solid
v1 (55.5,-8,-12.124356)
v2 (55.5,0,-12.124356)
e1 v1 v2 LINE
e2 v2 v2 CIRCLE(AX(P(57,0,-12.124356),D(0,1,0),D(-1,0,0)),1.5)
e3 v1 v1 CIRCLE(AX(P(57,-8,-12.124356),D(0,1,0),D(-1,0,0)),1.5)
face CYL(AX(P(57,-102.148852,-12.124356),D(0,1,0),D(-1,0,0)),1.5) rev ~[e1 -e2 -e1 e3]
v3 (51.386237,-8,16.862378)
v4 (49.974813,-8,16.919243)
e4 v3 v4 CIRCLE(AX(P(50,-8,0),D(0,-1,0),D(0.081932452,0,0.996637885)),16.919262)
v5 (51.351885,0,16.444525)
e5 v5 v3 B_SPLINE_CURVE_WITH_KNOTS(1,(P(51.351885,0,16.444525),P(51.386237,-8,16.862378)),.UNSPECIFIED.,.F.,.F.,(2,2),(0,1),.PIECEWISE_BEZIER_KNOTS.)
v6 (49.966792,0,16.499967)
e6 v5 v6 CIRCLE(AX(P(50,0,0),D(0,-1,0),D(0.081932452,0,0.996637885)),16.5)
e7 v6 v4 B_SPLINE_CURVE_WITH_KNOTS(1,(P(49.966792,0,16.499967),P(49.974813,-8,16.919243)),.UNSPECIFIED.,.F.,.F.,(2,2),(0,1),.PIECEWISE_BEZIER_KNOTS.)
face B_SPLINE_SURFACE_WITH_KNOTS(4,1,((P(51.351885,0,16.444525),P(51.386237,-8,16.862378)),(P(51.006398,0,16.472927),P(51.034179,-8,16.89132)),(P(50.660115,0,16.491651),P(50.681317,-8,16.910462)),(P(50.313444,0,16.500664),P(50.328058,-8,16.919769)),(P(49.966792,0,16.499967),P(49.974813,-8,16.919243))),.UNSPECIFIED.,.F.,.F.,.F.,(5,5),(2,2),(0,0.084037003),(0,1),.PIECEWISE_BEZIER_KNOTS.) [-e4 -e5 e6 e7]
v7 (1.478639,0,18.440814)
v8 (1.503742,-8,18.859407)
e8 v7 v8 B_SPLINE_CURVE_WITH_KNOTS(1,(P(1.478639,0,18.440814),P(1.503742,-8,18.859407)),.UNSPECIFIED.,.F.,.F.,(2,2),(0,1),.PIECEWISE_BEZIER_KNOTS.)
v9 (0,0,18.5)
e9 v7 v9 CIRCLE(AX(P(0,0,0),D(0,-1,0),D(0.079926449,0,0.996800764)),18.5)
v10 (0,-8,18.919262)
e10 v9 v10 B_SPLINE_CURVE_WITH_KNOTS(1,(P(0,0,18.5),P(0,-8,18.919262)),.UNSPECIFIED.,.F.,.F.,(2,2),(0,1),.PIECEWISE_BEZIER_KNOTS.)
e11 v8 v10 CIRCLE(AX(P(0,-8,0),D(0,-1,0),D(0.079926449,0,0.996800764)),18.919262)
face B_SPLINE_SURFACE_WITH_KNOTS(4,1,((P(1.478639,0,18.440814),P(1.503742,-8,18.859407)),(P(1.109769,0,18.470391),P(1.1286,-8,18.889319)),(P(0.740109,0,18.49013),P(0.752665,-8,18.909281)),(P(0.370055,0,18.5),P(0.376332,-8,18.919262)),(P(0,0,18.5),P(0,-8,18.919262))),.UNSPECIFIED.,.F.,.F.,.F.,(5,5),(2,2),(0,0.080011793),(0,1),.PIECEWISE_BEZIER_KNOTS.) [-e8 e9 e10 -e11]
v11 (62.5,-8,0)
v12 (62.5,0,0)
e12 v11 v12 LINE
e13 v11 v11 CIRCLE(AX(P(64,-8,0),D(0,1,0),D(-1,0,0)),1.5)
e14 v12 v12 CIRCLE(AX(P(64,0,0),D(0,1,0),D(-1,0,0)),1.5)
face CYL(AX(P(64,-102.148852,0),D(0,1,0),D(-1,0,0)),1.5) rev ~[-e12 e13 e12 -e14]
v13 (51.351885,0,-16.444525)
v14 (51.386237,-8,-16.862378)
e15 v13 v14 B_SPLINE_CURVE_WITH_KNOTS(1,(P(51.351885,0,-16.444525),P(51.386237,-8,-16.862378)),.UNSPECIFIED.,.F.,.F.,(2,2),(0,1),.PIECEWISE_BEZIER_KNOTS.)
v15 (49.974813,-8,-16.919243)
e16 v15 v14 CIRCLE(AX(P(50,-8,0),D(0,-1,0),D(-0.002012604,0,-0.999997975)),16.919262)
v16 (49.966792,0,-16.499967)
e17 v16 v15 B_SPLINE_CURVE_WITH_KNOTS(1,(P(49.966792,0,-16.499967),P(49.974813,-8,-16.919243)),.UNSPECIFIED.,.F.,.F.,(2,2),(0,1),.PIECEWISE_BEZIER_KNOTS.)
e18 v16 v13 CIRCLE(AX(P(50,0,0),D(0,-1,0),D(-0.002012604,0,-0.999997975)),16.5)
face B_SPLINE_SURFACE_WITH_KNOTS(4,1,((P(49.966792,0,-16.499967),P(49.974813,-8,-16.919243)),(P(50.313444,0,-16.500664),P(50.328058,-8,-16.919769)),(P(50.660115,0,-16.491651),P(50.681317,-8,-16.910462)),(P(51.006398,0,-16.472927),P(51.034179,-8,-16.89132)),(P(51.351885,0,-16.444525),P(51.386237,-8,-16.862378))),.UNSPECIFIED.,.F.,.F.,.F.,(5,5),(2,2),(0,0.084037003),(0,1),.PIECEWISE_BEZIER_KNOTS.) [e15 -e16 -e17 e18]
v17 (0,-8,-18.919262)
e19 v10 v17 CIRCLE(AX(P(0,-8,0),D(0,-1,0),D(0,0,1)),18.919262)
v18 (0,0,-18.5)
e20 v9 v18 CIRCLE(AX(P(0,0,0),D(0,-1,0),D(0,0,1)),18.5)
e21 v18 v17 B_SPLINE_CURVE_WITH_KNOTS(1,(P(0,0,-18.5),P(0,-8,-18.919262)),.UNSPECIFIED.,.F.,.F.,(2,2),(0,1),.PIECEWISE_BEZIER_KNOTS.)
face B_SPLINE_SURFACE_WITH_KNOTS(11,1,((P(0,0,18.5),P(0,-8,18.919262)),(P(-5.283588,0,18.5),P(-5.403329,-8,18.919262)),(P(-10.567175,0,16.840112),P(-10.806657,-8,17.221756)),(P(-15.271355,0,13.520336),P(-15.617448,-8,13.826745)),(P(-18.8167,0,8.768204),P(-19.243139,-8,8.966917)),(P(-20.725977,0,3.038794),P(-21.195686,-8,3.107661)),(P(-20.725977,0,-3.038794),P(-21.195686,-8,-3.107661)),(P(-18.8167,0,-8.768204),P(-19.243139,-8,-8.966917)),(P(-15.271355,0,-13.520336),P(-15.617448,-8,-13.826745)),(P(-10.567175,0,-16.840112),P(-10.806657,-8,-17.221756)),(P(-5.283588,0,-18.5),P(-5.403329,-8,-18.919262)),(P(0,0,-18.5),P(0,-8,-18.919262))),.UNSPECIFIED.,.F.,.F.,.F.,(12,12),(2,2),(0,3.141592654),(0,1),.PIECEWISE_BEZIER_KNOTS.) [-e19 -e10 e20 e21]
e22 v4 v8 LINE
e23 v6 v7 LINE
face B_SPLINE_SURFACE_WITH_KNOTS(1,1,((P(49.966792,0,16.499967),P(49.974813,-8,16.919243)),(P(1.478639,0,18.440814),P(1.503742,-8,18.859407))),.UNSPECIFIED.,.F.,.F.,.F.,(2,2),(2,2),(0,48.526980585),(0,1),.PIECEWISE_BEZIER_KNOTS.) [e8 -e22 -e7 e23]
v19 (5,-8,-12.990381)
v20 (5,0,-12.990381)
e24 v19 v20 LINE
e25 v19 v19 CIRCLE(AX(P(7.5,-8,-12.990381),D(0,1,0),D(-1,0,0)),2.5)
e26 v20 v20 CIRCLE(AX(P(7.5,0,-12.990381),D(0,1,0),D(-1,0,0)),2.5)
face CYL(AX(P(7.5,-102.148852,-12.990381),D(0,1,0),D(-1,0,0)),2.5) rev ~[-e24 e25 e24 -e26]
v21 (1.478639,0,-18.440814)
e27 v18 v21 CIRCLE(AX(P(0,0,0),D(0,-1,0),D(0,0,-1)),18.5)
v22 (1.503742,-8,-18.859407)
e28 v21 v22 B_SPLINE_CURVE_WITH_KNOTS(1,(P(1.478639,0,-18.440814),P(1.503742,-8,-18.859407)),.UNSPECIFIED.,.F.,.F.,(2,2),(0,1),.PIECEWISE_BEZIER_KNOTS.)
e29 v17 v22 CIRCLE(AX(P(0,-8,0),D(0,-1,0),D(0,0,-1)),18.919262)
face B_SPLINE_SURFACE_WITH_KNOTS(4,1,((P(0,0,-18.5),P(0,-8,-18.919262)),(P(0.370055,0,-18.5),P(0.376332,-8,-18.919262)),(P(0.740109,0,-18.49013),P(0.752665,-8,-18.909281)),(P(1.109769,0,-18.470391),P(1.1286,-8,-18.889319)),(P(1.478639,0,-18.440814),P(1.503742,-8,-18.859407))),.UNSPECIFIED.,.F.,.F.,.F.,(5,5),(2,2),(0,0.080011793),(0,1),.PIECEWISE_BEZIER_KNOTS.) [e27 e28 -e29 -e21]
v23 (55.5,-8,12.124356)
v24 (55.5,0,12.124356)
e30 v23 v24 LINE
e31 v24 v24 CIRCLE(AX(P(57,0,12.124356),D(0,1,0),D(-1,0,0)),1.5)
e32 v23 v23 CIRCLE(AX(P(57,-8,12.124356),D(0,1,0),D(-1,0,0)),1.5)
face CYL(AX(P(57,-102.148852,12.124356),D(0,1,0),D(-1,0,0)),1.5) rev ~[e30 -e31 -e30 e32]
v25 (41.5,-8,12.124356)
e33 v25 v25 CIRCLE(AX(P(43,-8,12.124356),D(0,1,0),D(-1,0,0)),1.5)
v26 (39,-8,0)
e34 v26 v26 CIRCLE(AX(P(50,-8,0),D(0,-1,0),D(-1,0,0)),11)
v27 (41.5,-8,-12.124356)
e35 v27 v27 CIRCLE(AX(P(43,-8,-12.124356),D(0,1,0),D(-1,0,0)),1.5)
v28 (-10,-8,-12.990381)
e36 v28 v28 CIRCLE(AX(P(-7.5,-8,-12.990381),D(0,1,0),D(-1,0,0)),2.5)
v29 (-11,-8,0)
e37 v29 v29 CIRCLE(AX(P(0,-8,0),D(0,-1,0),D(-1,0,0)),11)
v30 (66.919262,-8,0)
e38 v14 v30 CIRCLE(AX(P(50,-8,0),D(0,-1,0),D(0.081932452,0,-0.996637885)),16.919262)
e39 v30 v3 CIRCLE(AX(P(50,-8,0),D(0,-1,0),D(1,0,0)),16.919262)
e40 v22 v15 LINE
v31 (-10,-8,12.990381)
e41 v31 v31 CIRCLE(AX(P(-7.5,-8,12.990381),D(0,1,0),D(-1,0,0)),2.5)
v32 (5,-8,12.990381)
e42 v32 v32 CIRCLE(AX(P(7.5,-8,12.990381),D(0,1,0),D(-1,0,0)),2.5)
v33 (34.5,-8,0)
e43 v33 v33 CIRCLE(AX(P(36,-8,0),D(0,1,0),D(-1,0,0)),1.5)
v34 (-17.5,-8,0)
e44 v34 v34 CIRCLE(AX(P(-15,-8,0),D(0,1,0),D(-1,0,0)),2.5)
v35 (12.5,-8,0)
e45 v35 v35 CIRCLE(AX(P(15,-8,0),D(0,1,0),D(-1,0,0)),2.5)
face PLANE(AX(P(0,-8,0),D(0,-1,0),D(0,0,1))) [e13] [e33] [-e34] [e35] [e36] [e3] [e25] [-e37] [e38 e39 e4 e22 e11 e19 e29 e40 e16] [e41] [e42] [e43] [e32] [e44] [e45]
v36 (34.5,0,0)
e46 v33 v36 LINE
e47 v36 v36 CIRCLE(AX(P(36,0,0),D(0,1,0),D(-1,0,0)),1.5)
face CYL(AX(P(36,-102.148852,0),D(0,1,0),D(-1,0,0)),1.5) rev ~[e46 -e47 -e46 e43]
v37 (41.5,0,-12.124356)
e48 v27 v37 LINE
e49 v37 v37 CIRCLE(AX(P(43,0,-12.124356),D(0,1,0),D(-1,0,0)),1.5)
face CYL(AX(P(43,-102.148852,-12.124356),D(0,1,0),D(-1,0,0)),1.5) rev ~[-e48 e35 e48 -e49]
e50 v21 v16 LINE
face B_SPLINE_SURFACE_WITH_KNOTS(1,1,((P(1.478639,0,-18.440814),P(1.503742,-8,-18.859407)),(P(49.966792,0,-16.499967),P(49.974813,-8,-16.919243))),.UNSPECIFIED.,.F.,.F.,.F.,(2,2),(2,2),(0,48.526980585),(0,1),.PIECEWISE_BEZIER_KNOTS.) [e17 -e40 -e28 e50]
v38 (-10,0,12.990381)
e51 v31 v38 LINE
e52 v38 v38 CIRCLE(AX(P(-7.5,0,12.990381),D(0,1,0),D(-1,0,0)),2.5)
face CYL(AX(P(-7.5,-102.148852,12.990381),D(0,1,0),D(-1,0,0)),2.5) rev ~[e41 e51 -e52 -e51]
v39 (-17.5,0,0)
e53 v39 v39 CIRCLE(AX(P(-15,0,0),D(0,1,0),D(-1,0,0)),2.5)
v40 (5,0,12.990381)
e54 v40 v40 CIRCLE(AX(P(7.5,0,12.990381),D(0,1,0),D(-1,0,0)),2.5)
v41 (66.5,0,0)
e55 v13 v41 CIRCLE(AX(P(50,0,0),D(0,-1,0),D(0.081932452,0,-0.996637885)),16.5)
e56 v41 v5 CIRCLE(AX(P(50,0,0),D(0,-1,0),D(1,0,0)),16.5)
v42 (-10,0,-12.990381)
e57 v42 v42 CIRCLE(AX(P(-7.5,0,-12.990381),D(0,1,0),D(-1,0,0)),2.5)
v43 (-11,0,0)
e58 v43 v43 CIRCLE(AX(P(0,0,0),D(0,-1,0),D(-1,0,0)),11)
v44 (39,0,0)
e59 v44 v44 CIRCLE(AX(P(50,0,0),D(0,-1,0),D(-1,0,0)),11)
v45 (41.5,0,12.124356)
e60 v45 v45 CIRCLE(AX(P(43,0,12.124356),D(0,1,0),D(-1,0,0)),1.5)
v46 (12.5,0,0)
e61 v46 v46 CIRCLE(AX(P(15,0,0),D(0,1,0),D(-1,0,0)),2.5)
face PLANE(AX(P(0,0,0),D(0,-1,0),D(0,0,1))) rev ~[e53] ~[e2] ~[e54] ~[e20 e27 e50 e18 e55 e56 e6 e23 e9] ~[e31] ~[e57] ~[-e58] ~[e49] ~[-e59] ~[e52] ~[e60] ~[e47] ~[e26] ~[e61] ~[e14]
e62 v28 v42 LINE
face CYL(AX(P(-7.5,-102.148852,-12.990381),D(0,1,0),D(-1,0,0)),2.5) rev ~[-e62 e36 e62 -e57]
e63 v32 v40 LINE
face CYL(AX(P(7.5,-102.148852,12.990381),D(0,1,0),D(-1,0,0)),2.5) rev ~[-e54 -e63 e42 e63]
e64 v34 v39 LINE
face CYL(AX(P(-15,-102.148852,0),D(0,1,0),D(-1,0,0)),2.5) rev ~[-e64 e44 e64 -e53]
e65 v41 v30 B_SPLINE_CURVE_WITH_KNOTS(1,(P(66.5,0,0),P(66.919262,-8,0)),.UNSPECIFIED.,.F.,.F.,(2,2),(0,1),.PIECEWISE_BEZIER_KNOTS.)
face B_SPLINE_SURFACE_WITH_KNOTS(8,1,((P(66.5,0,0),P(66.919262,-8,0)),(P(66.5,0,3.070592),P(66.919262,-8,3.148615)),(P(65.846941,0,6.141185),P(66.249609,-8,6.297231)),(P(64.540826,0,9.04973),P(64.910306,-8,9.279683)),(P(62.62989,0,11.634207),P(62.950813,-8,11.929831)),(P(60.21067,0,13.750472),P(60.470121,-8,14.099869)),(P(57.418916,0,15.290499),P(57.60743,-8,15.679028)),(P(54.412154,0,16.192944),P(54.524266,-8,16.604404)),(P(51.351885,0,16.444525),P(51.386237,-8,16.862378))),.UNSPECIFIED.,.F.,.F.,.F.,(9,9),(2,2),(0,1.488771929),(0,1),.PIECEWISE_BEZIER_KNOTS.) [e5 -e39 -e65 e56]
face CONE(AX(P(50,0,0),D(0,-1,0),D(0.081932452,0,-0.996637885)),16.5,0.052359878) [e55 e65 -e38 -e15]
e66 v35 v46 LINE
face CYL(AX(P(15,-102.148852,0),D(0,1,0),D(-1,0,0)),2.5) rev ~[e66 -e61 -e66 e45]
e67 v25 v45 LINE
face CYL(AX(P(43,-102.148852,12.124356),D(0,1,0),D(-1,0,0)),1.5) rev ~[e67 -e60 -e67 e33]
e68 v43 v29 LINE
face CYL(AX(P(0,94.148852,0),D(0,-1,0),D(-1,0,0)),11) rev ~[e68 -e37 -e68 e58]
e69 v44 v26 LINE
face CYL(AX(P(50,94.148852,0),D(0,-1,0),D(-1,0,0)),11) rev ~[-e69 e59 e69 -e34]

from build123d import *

# Parameters (mm, degrees)
F1_DEPTH = 8
F1_TAPER = -3
F3_D     = 22
F4_D     = 22
F6_D     = 5
F7_D     = 3


# Not quite as in the source:
# - a feature of the source that left no trace in its solid (it failed there, or was rolled back) is left out


with BuildPart() as f1:
    # F0 (on Front) → F1 (new body)
    with BuildSketch(Plane.XZ):
        with BuildLine():
            Line((1.4786393064, 18.4408141307), (0, 18.5))
            ThreePointArc((0, 18.5), (-18.5, 0), (0, -18.5))
            Line((0, -18.5), (1.4786393064, -18.4408141307))
            ThreePointArc((1.4786393064, -18.4408141307), (13.5942051472, -12.5478120171), (18.5, 0))
            ThreePointArc((18.5, 0), (13.5942051472, 12.5478120171), (1.4786393064, 18.4408141307))
        make_face()
        with BuildLine():
            ThreePointArc((1.4786393064, 18.4408141307), (0.7399116781, 18.4851976108), (0, 18.5))
            Line((0, 18.5), (1.4786393064, 18.4408141307))
        make_face()
        with BuildLine():
            Line((1.4786393064, -18.4408141307), (0, -18.5))
            ThreePointArc((0, -18.5), (0.7399116781, -18.4851976108), (1.4786393064, -18.4408141307))
        make_face()
        with BuildLine():
            Line((49.9667920397, 16.4999665827), (1.4786393064, 18.4408141307))
            ThreePointArc((1.4786393064, 18.4408141307), (13.5942051472, 12.5478120171), (18.5, 0))
            Line((18.5, 0), (33.5, 0))
            ThreePointArc((33.5, 0), (38.3210032249, 11.6555151893), (49.9667920397, 16.4999665827))
        make_face()
        with BuildLine():
            ThreePointArc((18.5, 0), (13.5942051472, -12.5478120171), (1.4786393064, -18.4408141307))
            Line((1.4786393064, -18.4408141307), (49.9667920397, -16.4999665827))
            ThreePointArc((49.9667920397, -16.4999665827), (38.3210032249, -11.6555151893), (33.5, 0))
            Line((33.5, 0), (18.5, 0))
        make_face()
        with BuildLine():
            Line((51.3518854576, 16.4445250983), (49.9667920397, 16.4999665827))
            ThreePointArc((49.9667920397, 16.4999665827), (38.3210032249, 11.6555151893), (33.5, 0))
            ThreePointArc((33.5, 0), (38.3210032249, -11.6555151893), (49.9667920397, -16.4999665827))
            Line((49.9667920397, -16.4999665827), (51.3518854576, -16.4445250983))
            ThreePointArc((51.3518854576, -16.4445250983), (62.1358170316, -11.1790851582), (66.5, 0))
            ThreePointArc((66.5, 0), (62.1358170316, 11.1790851582), (51.3518854576, 16.4445250983))
        make_face()
        with BuildLine():
            ThreePointArc((51.3518854576, 16.4445250983), (50.6599212264, 16.4867978691), (49.9667920397, 16.4999665827))
            Line((49.9667920397, 16.4999665827), (51.3518854576, 16.4445250983))
        make_face()
        with BuildLine():
            Line((51.3518854576, -16.4445250983), (49.9667920397, -16.4999665827))
            ThreePointArc((49.9667920397, -16.4999665827), (50.6599212264, -16.4867978691), (51.3518854576, -16.4445250983))
        make_face()
    extrude(amount=F1_DEPTH, taper=F1_TAPER)

    # F3 (through all)
    with Locations(Plane(origin=(0, 0, 0), x_dir=(1, 0, 0), z_dir=(0, 1, 0))):
        with Locations((50, 0)):
            Hole(F3_D / 2)

    # F4 (through all)
    with Locations(Plane(origin=(0, 0, 0), x_dir=(1, 0, 0), z_dir=(0, 1, 0))):
        with Locations((0, 0)):
            Hole(F4_D / 2)

    # F6 (through all)
    with Locations(Plane.XZ.offset(8)):
        with Locations((15, 0), (7.5, 12.9903810568), (-7.5, 12.9903810568), (-15, 0), (-7.5, -12.9903810568), (7.5, -12.9903810568)):
            Hole(F6_D / 2)

    # F7 (through all)
    with Locations(Plane.XZ.offset(8)):
        with Locations((36, 0), (43, 12.124355653), (57, 12.124355653), (64, 0), (57, -12.124355653), (43, -12.124355653)):
            Hole(F7_D / 2)


solid = f1.part
